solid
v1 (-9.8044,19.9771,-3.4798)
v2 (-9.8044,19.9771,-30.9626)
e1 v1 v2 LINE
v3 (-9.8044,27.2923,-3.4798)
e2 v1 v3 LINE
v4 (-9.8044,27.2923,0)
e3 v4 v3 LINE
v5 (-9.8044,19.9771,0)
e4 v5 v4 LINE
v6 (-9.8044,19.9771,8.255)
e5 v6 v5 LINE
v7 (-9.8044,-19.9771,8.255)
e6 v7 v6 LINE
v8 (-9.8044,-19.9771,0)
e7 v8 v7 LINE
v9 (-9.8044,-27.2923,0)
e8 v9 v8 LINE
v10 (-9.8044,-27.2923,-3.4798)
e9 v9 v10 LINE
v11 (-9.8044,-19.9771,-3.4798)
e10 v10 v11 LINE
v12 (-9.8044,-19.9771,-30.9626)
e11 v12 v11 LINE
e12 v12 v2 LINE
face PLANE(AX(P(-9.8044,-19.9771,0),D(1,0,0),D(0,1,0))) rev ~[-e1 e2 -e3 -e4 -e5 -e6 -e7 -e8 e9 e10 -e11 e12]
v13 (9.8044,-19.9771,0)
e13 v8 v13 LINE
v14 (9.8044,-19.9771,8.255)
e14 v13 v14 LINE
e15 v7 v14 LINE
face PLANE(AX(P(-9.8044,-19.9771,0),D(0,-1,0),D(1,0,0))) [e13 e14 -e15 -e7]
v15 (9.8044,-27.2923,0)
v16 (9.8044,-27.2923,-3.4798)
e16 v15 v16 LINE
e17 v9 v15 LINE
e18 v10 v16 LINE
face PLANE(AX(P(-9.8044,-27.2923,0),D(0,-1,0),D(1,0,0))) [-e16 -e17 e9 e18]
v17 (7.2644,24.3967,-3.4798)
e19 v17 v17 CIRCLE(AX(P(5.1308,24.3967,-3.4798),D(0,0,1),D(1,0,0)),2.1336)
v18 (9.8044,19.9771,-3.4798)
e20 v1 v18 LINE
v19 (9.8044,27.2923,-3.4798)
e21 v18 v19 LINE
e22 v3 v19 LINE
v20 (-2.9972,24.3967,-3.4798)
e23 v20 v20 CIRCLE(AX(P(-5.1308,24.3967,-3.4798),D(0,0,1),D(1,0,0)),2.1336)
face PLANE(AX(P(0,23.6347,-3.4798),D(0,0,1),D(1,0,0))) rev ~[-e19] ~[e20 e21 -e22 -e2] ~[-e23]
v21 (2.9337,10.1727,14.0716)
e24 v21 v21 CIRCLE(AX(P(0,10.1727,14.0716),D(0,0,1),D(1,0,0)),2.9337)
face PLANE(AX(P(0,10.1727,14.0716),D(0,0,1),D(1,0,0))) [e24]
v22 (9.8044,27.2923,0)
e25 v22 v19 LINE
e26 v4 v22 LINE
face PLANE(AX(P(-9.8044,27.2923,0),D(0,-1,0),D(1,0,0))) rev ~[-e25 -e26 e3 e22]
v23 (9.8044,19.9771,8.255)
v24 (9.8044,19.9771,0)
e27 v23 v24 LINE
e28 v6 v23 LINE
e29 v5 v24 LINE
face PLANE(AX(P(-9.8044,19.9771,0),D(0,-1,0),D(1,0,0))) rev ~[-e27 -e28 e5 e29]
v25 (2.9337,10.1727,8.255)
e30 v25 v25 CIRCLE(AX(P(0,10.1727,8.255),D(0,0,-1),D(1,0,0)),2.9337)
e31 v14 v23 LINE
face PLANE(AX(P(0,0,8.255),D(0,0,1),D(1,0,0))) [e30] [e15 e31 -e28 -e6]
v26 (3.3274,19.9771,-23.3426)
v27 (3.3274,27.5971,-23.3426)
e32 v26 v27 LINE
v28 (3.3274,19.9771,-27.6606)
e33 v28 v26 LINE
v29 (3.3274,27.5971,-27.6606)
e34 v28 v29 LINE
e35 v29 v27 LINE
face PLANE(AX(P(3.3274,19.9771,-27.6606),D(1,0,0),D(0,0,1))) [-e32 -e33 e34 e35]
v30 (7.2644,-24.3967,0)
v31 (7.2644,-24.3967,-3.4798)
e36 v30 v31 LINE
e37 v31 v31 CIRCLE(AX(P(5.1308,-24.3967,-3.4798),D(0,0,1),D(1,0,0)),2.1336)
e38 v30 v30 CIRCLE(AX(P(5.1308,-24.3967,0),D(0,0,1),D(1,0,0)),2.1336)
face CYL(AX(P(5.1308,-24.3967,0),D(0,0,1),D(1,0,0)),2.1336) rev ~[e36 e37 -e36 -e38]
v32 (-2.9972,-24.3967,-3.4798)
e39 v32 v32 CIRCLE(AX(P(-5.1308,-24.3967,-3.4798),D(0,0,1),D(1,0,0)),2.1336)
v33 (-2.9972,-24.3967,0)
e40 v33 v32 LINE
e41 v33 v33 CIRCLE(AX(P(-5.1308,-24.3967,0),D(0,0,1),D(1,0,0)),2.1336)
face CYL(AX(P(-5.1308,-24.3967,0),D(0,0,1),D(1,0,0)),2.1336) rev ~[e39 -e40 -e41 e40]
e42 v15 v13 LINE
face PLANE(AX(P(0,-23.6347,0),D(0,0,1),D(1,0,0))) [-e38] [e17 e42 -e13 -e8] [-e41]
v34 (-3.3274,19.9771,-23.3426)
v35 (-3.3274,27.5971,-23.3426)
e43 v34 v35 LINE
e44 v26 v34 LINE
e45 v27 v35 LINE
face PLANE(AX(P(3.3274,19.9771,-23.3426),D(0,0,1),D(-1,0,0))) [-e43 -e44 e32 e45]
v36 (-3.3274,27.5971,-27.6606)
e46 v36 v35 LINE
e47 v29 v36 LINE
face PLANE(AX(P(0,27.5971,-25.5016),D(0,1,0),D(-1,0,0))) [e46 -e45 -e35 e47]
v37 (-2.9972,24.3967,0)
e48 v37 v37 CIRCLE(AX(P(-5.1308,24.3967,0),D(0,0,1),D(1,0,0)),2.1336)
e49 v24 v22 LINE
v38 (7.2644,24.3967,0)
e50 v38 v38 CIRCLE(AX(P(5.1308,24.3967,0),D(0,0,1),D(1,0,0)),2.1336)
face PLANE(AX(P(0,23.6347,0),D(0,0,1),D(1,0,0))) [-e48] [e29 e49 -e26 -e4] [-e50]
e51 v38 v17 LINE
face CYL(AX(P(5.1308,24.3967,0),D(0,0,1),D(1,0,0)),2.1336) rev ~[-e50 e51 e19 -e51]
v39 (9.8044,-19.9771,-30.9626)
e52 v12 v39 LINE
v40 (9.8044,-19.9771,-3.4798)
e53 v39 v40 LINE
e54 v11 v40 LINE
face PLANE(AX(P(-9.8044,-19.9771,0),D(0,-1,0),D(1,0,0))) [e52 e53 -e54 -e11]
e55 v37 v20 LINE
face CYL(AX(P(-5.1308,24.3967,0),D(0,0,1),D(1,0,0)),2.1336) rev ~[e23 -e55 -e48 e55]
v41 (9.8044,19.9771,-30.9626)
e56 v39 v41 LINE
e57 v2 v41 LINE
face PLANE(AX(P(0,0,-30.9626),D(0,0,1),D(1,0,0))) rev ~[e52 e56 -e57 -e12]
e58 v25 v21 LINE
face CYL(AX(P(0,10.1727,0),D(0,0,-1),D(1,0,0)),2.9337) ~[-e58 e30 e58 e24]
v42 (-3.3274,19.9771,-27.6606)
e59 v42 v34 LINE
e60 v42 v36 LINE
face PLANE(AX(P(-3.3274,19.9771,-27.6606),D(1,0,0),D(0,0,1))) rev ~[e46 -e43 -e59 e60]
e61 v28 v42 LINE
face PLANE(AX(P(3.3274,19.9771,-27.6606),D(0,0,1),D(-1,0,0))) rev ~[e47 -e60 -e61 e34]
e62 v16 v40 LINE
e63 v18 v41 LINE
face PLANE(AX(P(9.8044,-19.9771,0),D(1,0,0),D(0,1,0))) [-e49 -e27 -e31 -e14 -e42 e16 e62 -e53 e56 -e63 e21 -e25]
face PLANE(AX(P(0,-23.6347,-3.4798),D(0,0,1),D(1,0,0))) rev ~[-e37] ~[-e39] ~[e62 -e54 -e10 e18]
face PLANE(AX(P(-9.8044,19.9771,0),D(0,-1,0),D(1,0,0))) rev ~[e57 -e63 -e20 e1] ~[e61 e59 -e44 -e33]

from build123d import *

# Parameters (mm, degrees)
F4_R          = 2.9337
F5_DEPTH      = 14.0716
F4_W          = 19.6088
F4_H          = 39.9542
F6_DEPTH      = 8.255
F6_DEPTH_BACK = 30.9626
F4_H_2        = 7.3152
F4_R_2        = 2.1336
F7_DEPTH      = 3.4798
F9_W          = 6.6548
F9_H          = 4.318
F10_DEPTH     = 7.62


# Not quite as in the source:
# - a variable given as a bare number and used for a length is read in inches; the dataset says mm whatever the document's units were


with BuildPart() as f5:
    # F4 (on Top) → F5 (new body)
    with BuildSketch(Plane.XY):
        with Locations((0, 10.1727)):
            Circle(F4_R)
    extrude(amount=F5_DEPTH)

    # F4 (on Top) → F6 (join, two sides)
    with BuildSketch(Plane.XY) as f6_sk:
        Rectangle(F4_W, F4_H)
        with Locations((0, 10.1727)):
            Circle(F4_R, mode=Mode.SUBTRACT)
        with Locations((0, 10.1727)):
            Circle(F4_R)
    extrude(amount=F6_DEPTH)
    extrude(f6_sk.sketch, amount=-F6_DEPTH_BACK)

    # F4 (on Top) → F7 (join)
    with BuildSketch(Plane.XY):
        with Locations((0, 23.6347)):
            Rectangle(F4_W, F4_H_2)
        with Locations((-5.1308, 24.3967)):
            Circle(F4_R_2, mode=Mode.SUBTRACT)
        with Locations((5.1308, 24.3967)):
            Circle(F4_R_2, mode=Mode.SUBTRACT)
        with Locations((0, -23.6347)):
            Rectangle(F4_W, F4_H_2)
        with Locations((-5.1308, -24.3967)):
            Circle(F4_R_2, mode=Mode.SUBTRACT)
        with Locations((5.1308, -24.3967)):
            Circle(F4_R_2, mode=Mode.SUBTRACT)
    extrude(amount=-F7_DEPTH)

    # F9 (on face) → F10 (join)
    with BuildSketch(Plane(origin=(0, 19.9771, 0), x_dir=(-1, 0, 0), z_dir=(0, 1, 0))):
        with Locations((0, -25.5016)):
            Rectangle(F9_W, F9_H)
    extrude(amount=F10_DEPTH)


solid = f5.part
